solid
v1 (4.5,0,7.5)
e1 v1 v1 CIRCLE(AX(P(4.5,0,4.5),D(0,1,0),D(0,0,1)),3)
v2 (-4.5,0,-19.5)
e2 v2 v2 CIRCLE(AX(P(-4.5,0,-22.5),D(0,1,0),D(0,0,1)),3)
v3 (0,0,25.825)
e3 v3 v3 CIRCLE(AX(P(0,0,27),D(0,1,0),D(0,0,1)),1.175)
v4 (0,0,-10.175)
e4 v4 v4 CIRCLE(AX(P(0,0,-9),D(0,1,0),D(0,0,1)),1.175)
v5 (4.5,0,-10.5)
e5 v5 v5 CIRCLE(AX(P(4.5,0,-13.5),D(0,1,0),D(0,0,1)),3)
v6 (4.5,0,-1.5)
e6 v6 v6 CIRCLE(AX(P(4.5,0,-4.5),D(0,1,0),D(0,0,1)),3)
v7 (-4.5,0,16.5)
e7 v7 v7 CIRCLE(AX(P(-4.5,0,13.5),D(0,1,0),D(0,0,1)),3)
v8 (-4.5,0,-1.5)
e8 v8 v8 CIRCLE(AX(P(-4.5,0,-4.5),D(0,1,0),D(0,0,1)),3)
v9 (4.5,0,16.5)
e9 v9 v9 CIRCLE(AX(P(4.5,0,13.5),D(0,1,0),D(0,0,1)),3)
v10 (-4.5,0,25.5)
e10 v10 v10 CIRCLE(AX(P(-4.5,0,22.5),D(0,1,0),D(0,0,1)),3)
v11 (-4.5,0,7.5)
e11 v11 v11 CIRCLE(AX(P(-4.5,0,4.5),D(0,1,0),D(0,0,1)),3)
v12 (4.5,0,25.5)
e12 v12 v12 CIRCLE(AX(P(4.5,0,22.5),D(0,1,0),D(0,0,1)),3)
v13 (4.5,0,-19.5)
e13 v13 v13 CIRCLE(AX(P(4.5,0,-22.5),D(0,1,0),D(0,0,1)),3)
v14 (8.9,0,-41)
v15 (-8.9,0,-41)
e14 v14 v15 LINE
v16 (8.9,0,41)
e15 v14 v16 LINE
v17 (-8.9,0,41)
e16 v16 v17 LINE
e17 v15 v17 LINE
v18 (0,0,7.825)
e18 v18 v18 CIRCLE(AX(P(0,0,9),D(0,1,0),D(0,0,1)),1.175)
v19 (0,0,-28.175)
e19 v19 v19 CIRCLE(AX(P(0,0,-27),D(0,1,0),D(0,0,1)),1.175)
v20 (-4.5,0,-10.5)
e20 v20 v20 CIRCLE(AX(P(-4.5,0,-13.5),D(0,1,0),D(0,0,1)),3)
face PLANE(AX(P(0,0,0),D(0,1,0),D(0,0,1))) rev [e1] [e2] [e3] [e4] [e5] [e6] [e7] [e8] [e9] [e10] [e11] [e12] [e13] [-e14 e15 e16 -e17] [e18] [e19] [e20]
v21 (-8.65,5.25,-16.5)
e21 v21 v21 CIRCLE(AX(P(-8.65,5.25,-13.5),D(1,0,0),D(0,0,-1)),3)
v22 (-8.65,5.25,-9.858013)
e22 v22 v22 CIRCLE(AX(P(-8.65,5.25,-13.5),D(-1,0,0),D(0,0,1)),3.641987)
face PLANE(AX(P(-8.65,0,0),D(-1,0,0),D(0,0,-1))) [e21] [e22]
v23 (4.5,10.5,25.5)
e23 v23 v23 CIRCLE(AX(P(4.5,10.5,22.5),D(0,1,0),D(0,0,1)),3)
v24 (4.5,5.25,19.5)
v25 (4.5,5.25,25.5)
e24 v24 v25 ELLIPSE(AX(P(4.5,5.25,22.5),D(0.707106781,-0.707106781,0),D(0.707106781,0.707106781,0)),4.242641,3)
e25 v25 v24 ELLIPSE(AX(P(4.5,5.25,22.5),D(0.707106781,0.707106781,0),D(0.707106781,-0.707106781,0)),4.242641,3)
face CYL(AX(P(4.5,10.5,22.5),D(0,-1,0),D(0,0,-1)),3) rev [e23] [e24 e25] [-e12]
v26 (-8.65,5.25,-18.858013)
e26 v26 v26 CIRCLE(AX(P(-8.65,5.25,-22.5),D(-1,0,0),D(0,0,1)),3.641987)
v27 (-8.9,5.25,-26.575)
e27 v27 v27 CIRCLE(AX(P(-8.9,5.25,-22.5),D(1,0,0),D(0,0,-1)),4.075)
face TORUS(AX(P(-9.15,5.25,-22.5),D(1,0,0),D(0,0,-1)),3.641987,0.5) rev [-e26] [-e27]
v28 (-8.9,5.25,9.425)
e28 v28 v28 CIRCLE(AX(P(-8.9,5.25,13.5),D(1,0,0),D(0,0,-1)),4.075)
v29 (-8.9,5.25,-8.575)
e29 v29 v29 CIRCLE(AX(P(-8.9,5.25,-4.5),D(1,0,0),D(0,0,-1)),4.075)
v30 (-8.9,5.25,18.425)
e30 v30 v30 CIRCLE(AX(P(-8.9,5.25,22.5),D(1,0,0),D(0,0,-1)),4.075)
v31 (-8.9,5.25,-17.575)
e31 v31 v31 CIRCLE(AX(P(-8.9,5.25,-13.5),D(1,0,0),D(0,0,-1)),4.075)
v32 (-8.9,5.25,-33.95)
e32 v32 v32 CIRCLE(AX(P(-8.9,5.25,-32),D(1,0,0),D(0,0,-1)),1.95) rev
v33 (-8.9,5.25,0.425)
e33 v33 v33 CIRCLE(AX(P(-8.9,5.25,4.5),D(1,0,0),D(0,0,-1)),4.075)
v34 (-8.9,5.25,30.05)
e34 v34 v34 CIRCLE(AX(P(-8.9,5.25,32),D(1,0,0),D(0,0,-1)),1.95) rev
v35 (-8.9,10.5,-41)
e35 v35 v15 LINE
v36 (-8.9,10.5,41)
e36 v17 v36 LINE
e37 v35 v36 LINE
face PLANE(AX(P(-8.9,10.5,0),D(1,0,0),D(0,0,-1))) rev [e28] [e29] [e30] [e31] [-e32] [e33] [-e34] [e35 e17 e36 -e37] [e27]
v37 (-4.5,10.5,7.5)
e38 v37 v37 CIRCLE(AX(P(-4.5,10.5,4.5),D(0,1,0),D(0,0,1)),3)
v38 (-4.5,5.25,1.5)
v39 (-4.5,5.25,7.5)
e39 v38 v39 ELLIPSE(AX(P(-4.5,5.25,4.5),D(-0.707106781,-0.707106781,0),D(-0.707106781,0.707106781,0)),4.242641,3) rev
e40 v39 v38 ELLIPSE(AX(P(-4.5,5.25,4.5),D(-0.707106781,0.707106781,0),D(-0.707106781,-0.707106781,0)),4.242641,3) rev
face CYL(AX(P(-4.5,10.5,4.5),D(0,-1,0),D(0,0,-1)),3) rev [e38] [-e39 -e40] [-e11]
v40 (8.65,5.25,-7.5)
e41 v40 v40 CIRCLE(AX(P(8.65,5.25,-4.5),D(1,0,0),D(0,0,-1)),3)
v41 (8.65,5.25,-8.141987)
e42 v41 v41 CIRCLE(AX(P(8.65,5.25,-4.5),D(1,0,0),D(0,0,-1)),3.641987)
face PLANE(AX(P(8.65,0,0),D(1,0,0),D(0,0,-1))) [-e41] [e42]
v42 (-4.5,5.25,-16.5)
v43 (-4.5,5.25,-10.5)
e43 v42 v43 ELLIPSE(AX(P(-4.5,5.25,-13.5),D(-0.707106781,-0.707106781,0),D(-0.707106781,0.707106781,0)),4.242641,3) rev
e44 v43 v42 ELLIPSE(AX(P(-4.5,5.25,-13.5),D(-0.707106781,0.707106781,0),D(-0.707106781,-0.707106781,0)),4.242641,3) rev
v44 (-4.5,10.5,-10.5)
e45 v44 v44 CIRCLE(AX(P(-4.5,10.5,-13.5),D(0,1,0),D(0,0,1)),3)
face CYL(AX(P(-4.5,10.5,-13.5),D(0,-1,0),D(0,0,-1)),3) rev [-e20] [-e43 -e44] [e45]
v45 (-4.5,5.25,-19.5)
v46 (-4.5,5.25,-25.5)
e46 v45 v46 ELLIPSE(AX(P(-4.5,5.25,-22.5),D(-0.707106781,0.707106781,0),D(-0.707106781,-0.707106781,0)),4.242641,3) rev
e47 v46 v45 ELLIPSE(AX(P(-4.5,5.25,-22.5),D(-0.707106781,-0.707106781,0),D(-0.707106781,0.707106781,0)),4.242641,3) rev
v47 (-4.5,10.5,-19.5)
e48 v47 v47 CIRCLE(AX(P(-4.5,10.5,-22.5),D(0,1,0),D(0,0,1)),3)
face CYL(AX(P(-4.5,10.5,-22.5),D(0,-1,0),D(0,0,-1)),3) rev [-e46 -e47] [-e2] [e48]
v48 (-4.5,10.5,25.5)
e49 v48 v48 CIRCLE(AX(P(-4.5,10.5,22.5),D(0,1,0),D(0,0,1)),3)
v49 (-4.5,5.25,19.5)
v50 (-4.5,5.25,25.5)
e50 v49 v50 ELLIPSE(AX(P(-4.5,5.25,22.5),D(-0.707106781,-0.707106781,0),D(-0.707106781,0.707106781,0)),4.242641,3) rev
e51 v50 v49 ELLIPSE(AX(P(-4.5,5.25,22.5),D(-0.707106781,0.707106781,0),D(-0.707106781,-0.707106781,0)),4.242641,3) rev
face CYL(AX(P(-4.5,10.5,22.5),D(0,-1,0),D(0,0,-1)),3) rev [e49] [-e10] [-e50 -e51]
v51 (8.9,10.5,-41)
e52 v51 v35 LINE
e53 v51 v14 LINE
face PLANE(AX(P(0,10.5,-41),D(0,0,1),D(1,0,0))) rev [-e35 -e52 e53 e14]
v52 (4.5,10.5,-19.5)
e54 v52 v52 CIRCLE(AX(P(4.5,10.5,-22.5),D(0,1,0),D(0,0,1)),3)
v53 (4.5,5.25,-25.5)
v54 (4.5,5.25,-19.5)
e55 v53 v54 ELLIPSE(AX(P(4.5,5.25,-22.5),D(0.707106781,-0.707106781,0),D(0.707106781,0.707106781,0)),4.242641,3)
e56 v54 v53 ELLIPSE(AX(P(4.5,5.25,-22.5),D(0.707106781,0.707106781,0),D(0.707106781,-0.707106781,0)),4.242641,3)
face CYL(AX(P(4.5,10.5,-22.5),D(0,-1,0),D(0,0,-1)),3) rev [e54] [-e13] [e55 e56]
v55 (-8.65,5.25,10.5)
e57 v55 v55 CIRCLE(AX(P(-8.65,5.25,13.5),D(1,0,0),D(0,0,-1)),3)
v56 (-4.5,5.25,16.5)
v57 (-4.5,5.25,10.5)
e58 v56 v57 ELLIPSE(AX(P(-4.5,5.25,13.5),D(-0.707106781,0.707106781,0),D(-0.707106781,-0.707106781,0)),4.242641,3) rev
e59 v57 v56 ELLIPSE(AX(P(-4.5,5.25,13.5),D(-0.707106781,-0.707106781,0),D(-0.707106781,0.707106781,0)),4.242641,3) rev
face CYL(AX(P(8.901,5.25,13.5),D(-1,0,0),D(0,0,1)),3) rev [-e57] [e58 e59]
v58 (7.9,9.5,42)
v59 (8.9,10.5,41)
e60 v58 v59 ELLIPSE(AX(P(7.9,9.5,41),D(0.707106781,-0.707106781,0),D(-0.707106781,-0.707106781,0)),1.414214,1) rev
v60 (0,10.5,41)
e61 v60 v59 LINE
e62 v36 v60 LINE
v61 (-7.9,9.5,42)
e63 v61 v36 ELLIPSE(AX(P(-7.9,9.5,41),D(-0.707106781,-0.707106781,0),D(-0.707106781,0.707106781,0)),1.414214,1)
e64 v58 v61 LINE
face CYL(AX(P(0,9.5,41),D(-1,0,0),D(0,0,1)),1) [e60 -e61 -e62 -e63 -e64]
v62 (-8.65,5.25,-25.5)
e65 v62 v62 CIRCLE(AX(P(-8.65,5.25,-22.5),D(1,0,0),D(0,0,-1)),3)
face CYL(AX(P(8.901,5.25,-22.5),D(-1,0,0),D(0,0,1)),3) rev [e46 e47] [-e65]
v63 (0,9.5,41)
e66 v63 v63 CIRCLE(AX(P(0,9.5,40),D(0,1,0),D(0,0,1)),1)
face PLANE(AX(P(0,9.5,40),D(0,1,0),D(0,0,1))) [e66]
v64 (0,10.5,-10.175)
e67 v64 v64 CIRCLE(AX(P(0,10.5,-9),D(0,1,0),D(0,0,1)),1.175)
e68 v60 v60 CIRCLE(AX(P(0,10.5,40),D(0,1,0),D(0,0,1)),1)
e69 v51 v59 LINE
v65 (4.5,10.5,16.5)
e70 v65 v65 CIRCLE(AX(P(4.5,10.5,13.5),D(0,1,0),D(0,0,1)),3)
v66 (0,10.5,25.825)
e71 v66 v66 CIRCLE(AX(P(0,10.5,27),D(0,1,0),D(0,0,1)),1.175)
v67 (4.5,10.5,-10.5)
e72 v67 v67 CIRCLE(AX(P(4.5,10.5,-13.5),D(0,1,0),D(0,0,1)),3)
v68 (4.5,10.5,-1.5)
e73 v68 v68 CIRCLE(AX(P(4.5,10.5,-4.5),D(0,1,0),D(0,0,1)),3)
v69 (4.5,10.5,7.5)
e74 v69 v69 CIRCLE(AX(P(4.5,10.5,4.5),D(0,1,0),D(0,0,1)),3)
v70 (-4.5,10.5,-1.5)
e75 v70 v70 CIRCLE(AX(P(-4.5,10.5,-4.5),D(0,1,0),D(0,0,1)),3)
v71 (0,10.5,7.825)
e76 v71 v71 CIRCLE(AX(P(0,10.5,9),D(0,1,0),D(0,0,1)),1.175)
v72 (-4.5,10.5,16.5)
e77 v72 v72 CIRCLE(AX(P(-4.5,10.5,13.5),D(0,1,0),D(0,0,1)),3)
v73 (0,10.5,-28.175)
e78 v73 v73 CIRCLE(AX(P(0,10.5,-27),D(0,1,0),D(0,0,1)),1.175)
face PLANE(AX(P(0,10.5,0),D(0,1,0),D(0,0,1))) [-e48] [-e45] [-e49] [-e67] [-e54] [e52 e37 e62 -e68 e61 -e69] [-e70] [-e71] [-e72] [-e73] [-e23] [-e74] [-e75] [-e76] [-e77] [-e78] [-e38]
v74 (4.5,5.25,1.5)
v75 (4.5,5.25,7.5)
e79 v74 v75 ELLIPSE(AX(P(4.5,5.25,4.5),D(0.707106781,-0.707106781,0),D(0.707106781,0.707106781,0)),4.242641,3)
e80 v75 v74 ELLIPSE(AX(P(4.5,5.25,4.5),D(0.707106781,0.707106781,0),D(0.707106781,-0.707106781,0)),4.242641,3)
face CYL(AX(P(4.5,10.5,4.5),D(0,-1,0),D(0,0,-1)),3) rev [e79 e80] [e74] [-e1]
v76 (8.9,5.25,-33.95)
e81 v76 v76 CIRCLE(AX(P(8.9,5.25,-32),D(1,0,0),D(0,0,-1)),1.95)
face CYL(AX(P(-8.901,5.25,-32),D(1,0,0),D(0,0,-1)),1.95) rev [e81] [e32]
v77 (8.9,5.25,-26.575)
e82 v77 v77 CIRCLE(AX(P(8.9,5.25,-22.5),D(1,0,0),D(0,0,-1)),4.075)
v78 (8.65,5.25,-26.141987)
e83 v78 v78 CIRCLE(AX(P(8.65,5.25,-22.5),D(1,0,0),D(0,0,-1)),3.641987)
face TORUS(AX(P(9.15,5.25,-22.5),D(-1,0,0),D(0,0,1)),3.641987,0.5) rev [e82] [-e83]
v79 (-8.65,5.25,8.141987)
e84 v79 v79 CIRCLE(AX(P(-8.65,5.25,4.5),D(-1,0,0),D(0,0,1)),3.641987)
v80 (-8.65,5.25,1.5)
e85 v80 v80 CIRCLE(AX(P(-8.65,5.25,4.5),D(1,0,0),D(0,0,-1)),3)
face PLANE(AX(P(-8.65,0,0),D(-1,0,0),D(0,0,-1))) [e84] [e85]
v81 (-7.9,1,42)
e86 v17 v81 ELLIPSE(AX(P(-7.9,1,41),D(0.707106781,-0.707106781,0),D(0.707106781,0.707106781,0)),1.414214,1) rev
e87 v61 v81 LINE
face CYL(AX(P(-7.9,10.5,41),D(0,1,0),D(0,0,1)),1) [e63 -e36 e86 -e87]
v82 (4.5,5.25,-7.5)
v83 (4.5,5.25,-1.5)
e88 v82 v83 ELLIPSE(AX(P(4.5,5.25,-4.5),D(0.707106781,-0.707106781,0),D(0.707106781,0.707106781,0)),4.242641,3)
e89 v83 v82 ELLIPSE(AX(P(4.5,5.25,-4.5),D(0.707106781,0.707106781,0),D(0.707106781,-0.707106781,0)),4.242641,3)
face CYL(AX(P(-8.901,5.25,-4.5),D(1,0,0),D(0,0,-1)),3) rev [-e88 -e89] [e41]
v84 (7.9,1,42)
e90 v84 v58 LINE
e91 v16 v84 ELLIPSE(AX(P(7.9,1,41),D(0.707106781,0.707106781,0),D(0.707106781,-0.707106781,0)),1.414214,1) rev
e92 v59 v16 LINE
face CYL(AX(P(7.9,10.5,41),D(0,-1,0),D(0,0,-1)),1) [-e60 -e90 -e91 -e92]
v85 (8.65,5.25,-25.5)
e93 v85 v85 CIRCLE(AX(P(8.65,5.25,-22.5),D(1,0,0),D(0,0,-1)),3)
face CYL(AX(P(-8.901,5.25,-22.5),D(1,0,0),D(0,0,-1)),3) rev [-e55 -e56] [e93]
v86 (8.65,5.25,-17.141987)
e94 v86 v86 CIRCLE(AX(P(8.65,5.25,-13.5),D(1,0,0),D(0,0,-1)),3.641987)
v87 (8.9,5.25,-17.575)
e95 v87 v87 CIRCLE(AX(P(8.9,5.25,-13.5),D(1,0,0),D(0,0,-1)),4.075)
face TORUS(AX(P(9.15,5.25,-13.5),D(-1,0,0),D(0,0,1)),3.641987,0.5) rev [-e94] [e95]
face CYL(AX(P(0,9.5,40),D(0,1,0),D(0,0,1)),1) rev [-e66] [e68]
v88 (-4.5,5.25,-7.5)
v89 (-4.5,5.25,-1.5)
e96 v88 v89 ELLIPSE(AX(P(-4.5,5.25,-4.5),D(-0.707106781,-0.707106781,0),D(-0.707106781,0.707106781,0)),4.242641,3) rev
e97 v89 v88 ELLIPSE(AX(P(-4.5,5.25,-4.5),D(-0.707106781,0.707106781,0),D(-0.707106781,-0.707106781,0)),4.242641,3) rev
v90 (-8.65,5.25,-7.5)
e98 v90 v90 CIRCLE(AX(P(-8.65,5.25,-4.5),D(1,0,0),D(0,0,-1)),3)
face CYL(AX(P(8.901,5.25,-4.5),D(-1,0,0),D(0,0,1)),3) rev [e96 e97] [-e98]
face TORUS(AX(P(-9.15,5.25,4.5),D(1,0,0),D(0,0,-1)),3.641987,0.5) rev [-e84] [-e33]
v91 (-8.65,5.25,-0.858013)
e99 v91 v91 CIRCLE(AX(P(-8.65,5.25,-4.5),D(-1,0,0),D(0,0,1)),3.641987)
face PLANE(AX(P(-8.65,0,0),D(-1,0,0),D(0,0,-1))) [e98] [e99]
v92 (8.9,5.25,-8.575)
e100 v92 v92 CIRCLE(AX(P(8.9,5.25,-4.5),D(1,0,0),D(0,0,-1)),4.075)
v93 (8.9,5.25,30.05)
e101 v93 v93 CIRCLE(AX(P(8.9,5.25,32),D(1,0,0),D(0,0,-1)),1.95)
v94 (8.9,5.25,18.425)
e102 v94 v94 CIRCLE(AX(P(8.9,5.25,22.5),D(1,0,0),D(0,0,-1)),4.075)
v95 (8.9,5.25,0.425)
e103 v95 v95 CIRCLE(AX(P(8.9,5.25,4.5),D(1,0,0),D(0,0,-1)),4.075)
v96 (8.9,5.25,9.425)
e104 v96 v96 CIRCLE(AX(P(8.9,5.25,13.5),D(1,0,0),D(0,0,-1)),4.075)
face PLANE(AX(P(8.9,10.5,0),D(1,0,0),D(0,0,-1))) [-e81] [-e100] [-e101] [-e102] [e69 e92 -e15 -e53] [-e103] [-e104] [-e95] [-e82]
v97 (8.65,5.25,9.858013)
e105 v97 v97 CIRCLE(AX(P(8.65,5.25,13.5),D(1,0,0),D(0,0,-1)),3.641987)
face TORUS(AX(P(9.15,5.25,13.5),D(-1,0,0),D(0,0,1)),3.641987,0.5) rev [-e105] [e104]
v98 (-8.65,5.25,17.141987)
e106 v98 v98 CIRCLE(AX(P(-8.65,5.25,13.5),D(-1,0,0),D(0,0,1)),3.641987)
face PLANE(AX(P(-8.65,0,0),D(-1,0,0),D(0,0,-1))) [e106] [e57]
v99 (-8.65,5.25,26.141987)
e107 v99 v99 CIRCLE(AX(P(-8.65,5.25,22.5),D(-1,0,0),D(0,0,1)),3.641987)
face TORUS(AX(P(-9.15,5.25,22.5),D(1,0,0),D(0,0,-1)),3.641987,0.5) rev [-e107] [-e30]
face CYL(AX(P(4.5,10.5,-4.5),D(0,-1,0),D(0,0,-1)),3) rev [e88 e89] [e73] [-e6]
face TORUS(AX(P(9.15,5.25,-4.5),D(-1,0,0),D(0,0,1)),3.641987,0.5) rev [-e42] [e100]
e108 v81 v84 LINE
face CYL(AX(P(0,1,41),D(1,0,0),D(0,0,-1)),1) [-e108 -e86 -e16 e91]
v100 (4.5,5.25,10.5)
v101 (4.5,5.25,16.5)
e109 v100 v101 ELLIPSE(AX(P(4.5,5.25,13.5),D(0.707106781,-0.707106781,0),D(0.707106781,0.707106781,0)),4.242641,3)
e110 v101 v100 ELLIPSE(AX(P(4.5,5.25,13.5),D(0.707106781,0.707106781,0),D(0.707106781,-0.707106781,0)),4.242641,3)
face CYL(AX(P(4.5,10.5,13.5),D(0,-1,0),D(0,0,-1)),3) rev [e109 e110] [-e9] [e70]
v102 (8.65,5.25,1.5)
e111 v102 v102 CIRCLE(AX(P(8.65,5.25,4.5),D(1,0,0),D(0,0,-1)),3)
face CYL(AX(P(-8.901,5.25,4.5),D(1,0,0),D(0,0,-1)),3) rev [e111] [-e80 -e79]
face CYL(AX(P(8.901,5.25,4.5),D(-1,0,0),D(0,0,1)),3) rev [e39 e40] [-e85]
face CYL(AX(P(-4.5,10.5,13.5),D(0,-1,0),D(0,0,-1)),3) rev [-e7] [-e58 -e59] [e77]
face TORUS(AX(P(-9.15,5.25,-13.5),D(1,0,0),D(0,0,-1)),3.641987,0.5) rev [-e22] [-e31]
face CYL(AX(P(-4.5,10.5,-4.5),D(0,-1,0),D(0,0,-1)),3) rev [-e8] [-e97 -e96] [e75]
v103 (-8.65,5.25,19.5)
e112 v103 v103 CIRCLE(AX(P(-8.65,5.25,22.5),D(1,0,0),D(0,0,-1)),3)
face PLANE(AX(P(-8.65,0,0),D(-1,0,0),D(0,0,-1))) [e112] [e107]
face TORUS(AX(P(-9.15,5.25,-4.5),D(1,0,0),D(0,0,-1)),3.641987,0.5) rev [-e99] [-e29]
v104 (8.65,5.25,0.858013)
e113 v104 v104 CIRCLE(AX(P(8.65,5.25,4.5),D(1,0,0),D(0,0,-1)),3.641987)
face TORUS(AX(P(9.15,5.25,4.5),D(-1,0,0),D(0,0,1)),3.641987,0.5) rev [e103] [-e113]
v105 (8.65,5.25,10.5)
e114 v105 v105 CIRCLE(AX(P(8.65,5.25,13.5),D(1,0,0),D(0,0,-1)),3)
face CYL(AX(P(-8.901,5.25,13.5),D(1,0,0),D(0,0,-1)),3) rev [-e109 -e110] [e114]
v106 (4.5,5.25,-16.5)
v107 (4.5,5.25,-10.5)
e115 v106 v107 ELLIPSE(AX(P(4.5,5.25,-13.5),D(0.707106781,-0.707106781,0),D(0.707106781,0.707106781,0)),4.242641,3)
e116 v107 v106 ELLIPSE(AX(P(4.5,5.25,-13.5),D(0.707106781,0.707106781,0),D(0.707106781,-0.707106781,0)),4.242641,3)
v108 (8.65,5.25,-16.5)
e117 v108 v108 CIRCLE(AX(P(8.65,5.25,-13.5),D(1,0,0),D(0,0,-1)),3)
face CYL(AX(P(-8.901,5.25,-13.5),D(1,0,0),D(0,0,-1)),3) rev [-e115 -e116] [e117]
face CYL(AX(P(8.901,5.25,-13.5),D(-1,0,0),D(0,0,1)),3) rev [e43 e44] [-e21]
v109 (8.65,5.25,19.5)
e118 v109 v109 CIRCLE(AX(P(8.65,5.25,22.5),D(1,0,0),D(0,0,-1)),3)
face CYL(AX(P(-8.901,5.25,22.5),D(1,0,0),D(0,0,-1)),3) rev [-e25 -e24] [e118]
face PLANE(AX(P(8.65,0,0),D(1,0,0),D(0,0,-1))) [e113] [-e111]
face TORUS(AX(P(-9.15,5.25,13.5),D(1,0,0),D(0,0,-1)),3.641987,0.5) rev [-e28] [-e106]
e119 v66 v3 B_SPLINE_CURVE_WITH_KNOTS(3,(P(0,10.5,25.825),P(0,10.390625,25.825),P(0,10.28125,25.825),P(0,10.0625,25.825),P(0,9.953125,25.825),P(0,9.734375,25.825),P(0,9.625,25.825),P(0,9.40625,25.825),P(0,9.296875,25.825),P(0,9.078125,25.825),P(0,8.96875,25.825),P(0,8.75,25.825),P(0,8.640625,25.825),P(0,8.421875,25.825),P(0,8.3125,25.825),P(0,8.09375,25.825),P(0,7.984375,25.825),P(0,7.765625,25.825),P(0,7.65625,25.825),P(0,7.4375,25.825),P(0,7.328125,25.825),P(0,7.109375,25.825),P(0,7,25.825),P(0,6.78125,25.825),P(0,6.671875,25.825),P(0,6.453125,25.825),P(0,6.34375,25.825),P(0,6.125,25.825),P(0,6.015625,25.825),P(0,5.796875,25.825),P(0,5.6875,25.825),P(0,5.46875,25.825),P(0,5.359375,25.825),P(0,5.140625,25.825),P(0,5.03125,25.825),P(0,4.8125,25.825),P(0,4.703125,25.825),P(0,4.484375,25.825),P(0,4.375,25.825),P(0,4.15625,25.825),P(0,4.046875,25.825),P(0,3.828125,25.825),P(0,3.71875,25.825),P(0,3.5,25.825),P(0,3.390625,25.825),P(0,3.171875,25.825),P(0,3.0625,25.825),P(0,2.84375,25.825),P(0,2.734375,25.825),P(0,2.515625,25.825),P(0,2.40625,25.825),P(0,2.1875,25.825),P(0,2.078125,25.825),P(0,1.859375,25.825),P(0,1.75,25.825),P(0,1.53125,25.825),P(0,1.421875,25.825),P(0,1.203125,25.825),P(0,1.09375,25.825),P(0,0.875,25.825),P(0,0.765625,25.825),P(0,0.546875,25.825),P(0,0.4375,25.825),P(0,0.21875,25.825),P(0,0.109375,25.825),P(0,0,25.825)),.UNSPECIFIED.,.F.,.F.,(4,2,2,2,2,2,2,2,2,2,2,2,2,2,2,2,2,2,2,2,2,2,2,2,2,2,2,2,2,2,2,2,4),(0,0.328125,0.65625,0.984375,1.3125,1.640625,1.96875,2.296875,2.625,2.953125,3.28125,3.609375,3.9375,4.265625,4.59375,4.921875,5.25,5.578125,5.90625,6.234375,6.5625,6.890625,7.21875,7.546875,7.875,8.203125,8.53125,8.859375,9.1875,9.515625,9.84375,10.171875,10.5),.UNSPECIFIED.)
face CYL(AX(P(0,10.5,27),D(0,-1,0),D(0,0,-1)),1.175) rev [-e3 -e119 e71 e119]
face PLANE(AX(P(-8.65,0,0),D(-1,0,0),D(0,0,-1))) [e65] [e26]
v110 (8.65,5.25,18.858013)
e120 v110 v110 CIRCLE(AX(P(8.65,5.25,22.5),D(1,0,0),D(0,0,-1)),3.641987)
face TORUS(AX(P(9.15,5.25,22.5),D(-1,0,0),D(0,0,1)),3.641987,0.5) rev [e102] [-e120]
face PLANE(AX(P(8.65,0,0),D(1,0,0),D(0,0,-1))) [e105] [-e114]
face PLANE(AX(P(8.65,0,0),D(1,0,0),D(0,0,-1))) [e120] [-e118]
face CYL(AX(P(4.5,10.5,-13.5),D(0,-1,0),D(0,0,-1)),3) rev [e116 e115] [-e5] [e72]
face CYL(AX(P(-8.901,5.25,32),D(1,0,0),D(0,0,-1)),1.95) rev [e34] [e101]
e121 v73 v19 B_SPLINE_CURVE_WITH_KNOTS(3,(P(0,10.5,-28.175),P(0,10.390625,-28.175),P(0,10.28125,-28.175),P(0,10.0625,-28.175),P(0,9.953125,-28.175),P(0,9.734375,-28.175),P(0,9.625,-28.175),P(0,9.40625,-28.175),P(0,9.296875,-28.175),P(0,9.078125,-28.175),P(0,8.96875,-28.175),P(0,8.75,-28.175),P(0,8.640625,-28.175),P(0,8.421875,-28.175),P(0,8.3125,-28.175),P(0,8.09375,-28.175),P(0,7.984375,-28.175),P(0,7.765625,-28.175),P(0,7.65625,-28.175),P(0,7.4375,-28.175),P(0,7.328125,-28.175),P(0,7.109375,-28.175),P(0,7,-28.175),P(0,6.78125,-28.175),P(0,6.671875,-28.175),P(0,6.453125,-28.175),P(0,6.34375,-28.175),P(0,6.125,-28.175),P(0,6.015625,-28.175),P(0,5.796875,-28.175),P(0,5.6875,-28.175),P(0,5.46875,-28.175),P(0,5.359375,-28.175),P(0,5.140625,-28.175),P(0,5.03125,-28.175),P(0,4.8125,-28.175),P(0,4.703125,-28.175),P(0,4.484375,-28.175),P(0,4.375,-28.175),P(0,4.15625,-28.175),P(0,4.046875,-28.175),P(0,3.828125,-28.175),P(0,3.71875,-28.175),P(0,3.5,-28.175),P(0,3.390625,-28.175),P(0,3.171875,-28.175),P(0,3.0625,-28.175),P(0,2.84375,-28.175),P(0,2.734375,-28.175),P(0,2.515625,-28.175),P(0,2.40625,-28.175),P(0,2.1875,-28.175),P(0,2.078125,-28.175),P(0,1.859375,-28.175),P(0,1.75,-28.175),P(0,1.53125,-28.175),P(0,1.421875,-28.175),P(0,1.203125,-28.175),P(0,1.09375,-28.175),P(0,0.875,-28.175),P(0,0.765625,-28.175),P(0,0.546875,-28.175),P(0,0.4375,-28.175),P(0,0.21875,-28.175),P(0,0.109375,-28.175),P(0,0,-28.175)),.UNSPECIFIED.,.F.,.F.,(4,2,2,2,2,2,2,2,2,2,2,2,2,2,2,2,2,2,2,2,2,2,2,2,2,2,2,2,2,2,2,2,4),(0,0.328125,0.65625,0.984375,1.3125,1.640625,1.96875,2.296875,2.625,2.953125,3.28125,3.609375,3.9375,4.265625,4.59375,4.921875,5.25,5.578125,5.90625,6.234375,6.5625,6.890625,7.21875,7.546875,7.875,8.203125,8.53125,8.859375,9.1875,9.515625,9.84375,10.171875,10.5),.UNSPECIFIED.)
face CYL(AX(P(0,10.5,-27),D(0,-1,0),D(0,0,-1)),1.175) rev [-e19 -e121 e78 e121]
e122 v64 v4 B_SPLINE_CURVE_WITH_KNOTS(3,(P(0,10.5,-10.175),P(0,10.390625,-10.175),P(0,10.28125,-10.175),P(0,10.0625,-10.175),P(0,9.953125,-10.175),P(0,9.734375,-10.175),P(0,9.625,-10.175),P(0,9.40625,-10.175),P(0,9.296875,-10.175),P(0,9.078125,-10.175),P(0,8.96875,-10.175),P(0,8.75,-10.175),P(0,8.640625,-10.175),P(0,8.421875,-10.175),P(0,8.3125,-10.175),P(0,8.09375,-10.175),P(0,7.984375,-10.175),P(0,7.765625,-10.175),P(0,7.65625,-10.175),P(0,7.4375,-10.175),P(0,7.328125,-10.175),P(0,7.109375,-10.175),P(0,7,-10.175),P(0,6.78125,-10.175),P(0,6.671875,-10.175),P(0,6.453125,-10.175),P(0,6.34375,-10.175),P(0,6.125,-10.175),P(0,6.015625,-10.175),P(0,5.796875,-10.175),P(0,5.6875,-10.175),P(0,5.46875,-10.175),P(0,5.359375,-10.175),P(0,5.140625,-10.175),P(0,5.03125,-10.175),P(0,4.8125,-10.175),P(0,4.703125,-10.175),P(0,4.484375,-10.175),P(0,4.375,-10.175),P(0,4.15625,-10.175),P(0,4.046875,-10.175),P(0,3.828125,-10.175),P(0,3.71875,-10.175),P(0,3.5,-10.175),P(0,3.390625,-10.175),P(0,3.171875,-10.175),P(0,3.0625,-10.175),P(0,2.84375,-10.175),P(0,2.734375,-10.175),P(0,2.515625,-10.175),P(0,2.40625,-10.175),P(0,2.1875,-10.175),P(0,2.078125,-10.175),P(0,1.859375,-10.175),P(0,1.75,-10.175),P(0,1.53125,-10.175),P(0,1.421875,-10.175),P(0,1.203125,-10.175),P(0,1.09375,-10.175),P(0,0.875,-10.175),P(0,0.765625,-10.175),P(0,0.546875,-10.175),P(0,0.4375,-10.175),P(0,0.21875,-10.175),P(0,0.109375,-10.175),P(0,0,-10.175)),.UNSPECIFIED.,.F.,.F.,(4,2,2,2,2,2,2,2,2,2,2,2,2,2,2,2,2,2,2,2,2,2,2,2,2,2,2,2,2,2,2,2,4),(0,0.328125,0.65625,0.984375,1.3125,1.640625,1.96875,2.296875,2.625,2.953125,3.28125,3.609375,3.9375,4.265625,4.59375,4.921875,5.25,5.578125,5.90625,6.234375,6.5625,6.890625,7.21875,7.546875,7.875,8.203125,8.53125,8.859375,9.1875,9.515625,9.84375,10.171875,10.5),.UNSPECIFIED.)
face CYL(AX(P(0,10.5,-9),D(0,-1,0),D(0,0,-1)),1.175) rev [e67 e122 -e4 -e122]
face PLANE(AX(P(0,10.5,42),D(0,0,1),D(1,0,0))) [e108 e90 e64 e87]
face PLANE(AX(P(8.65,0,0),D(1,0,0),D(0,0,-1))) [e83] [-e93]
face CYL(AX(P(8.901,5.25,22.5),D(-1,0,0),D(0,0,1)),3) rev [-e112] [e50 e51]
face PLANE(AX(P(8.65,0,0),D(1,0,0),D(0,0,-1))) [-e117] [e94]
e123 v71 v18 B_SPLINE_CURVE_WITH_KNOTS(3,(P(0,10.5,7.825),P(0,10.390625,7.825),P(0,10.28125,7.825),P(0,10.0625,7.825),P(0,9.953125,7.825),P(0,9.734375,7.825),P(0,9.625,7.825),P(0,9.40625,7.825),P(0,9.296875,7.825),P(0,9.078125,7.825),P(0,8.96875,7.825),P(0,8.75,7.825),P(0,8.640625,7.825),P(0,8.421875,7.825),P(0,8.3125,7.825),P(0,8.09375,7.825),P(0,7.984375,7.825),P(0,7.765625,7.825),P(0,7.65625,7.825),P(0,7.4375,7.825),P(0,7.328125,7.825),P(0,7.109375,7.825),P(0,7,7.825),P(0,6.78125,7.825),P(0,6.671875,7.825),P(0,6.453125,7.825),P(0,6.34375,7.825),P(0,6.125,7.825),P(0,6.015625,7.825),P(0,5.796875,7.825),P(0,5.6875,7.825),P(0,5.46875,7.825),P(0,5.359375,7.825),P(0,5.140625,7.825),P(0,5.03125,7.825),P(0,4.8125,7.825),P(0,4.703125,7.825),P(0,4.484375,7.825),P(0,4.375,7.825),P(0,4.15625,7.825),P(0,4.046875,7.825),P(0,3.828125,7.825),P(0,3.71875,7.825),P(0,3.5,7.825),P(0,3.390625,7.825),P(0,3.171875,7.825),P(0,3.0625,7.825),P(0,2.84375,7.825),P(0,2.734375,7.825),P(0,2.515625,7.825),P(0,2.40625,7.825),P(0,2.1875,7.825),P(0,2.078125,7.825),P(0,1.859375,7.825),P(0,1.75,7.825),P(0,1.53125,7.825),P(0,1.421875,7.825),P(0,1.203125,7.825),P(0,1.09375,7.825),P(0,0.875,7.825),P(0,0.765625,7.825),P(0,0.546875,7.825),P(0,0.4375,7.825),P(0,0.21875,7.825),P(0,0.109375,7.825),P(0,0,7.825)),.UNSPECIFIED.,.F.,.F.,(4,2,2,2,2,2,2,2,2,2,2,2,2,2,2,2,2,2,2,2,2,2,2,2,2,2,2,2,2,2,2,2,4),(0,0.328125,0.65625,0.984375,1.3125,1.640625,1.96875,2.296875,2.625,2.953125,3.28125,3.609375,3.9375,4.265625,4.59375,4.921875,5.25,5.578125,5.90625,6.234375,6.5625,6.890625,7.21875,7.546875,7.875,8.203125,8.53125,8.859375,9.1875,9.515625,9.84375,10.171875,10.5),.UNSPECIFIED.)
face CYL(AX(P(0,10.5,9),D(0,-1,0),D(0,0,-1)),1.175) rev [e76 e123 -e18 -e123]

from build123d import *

# Parameters (mm, degrees)
SKETCH1_W            = 17.8
SKETCH1_H            = 83
SKETCH1_R            = 1.175
SKETCH1_R_2          = 3
BOSS_EXTRUDE1_DEPTH  = 10.5
SKETCH3_R            = 1
CUT_EXTRUDE1_DEPTH   = 1
FILLET1_R            = 1
CUT_EXTRUDE2_REACH   = 48.809
SKETCH4_R            = 1.95
CUT_EXTRUDE4_REACH   = 48.809
SKETCH4_3_R          = 3
SKETCH4_4_R          = 4.075
SKETCH4_4_R_2        = 3
CUT_EXTRUDE5_DEPTH   = 0.25
FILLET8_R            = 0.5
FILLET8_OF_MIRROR3_R = 0.5


# Some blends are built 0.0001 mm under size
with BuildPart() as part:
    # Sketch1 → Boss-Extrude1 (new body)
    with BuildSketch(Plane(origin=(0, 0, 0), x_dir=(1, 0, 0), z_dir=(0, 1, 0))):
        with Locations((0, -0.5)):
            Rectangle(SKETCH1_W, SKETCH1_H)
        with Locations(Location((0, 27, 0), (0, 0, 90))):
            Circle(SKETCH1_R, mode=Mode.SUBTRACT)
        with Locations(Location((0, 9, 0), (0, 0, 90))):
            Circle(SKETCH1_R, mode=Mode.SUBTRACT)
        with Locations(Location((0, -9, 0), (0, 0, 90))):
            Circle(SKETCH1_R, mode=Mode.SUBTRACT)
        with Locations(Location((0, -27, 0), (0, 0, 90))):
            Circle(SKETCH1_R, mode=Mode.SUBTRACT)
        with Locations(Location((-4.5, -22.5, 0), (0, 0, 90))):
            Circle(SKETCH1_R_2, mode=Mode.SUBTRACT)
        with Locations(Location((-4.5, -13.5, 0), (0, 0, 90))):
            Circle(SKETCH1_R_2, mode=Mode.SUBTRACT)
        with Locations(Location((-4.5, -4.5, 0), (0, 0, 90))):
            Circle(SKETCH1_R_2, mode=Mode.SUBTRACT)
        with Locations(Location((-4.5, 4.5, 0), (0, 0, 90))):
            Circle(SKETCH1_R_2, mode=Mode.SUBTRACT)
        with Locations(Location((-4.5, 13.5, 0), (0, 0, 90))):
            Circle(SKETCH1_R_2, mode=Mode.SUBTRACT)
        with Locations(Location((-4.5, 22.5, 0), (0, 0, 90))):
            Circle(SKETCH1_R_2, mode=Mode.SUBTRACT)
        with Locations(Location((4.5, -13.5, 0), (0, 0, 90))):
            Circle(SKETCH1_R_2, mode=Mode.SUBTRACT)
        with Locations(Location((4.5, -4.5, 0), (0, 0, 90))):
            Circle(SKETCH1_R_2, mode=Mode.SUBTRACT)
        with Locations(Location((4.5, 4.5, 0), (0, 0, 90))):
            Circle(SKETCH1_R_2, mode=Mode.SUBTRACT)
        with Locations(Location((4.5, 13.5, 0), (0, 0, 90))):
            Circle(SKETCH1_R_2, mode=Mode.SUBTRACT)
        with Locations(Location((4.5, 22.5, 0), (0, 0, 90))):
            Circle(SKETCH1_R_2, mode=Mode.SUBTRACT)
        with Locations(Location((4.5, -22.5, 0), (0, 0, 90))):
            Circle(SKETCH1_R_2, mode=Mode.SUBTRACT)
    extrude(amount=BOSS_EXTRUDE1_DEPTH)

    # Sketch3 → Cut-Extrude1 (cut)
    with BuildSketch(Plane(origin=(0, 10.5, 0), x_dir=(1, 0, 0), z_dir=(0, 1, 0))):
        with Locations(Location((0, -40, 0), (0, 0, 270))):
            Circle(SKETCH3_R)
    extrude(amount=-CUT_EXTRUDE1_DEPTH, mode=Mode.SUBTRACT)

    # Fillet1
    fillet1_edges = [part.edges().sort_by_distance(p)[0] for p in [
        (0, 10.5, 42),
        (0, 0, 42),
        (-8.9, 5.25, 42),
        (8.9, 5.25, 42),
    ]]
    fillet(fillet1_edges, radius=FILLET1_R - 0.0001)  # a hair under: the kernel refuses the full size

    # Sketch4 → Cut-Extrude2 (cut, up to next)
    with BuildSketch(Plane(origin=(8.9, 0, 0), x_dir=(0, 0, -1), z_dir=(1, 0, 0)), mode=Mode.PRIVATE) as cut_extrude2_sk1:
        with Locations((-32, 5.25)):
            Circle(SKETCH4_R)
    cut_extrude2_tool1 = extrude(cut_extrude2_sk1.sketch, amount=-CUT_EXTRUDE2_REACH, mode=Mode.PRIVATE) & part.part
    # Sketch4 → Cut-Extrude2 (cut, up to next)
    with BuildSketch(Plane(origin=(8.9, 0, 0), x_dir=(0, 0, -1), z_dir=(1, 0, 0)), mode=Mode.PRIVATE) as cut_extrude2_sk2:
        with Locations((32, 5.25)):
            Circle(SKETCH4_R)
    cut_extrude2_tool2 = extrude(cut_extrude2_sk2.sketch, amount=-CUT_EXTRUDE2_REACH, mode=Mode.PRIVATE) & part.part
    add(cut_extrude2_tool1.solids().sort_by_distance((8.9, 5.25, 32))[0], mode=Mode.SUBTRACT)
    add(cut_extrude2_tool2.solids().sort_by_distance((8.9, 5.25, -32))[0], mode=Mode.SUBTRACT)

    # Sketch4<3> → Cut-Extrude4 (cut, up to next)
    with BuildSketch(Plane(origin=(8.9, 0, 0), x_dir=(0, 0, -1), z_dir=(1, 0, 0)), mode=Mode.PRIVATE) as cut_extrude4_sk1:
        with Locations((-22.5, 5.25)):
            Circle(SKETCH4_3_R)
    cut_extrude4_tool1 = extrude(cut_extrude4_sk1.sketch, amount=-CUT_EXTRUDE4_REACH, mode=Mode.PRIVATE) & part.part
    # Sketch4<3> → Cut-Extrude4 (cut, up to next)
    with BuildSketch(Plane(origin=(8.9, 0, 0), x_dir=(0, 0, -1), z_dir=(1, 0, 0)), mode=Mode.PRIVATE) as cut_extrude4_sk2:
        with Locations((-13.5, 5.25)):
            Circle(SKETCH4_3_R)
    cut_extrude4_tool2 = extrude(cut_extrude4_sk2.sketch, amount=-CUT_EXTRUDE4_REACH, mode=Mode.PRIVATE) & part.part
    # Sketch4<3> → Cut-Extrude4 (cut, up to next)
    with BuildSketch(Plane(origin=(8.9, 0, 0), x_dir=(0, 0, -1), z_dir=(1, 0, 0)), mode=Mode.PRIVATE) as cut_extrude4_sk3:
        with Locations((-4.5, 5.25)):
            Circle(SKETCH4_3_R)
    cut_extrude4_tool3 = extrude(cut_extrude4_sk3.sketch, amount=-CUT_EXTRUDE4_REACH, mode=Mode.PRIVATE) & part.part
    # Sketch4<3> → Cut-Extrude4 (cut, up to next)
    with BuildSketch(Plane(origin=(8.9, 0, 0), x_dir=(0, 0, -1), z_dir=(1, 0, 0)), mode=Mode.PRIVATE) as cut_extrude4_sk4:
        with Locations((4.5, 5.25)):
            Circle(SKETCH4_3_R)
    cut_extrude4_tool4 = extrude(cut_extrude4_sk4.sketch, amount=-CUT_EXTRUDE4_REACH, mode=Mode.PRIVATE) & part.part
    # Sketch4<3> → Cut-Extrude4 (cut, up to next)
    with BuildSketch(Plane(origin=(8.9, 0, 0), x_dir=(0, 0, -1), z_dir=(1, 0, 0)), mode=Mode.PRIVATE) as cut_extrude4_sk5:
        with Locations((13.5, 5.25)):
            Circle(SKETCH4_3_R)
    cut_extrude4_tool5 = extrude(cut_extrude4_sk5.sketch, amount=-CUT_EXTRUDE4_REACH, mode=Mode.PRIVATE) & part.part
    # Sketch4<3> → Cut-Extrude4 (cut, up to next)
    with BuildSketch(Plane(origin=(8.9, 0, 0), x_dir=(0, 0, -1), z_dir=(1, 0, 0)), mode=Mode.PRIVATE) as cut_extrude4_sk6:
        with Locations((22.5, 5.25)):
            Circle(SKETCH4_3_R)
    cut_extrude4_tool6 = extrude(cut_extrude4_sk6.sketch, amount=-CUT_EXTRUDE4_REACH, mode=Mode.PRIVATE) & part.part
    cut_extrude4_1 = cut_extrude4_tool1.solids().sort_by_distance((8.9, 5.25, 22.5))[0]
    add(cut_extrude4_1, mode=Mode.SUBTRACT)
    cut_extrude4_2 = cut_extrude4_tool2.solids().sort_by_distance((8.9, 5.25, 13.5))[0]
    add(cut_extrude4_2, mode=Mode.SUBTRACT)
    cut_extrude4_3 = cut_extrude4_tool3.solids().sort_by_distance((8.9, 5.25, 4.5))[0]
    add(cut_extrude4_3, mode=Mode.SUBTRACT)
    cut_extrude4_4 = cut_extrude4_tool4.solids().sort_by_distance((8.9, 5.25, -4.5))[0]
    add(cut_extrude4_4, mode=Mode.SUBTRACT)
    cut_extrude4_5 = cut_extrude4_tool5.solids().sort_by_distance((8.9, 5.25, -13.5))[0]
    add(cut_extrude4_5, mode=Mode.SUBTRACT)
    cut_extrude4_6 = cut_extrude4_tool6.solids().sort_by_distance((8.9, 5.25, -22.5))[0]
    add(cut_extrude4_6, mode=Mode.SUBTRACT)
    cut_extrude4 = cut_extrude4_1 + cut_extrude4_2 + cut_extrude4_3 + cut_extrude4_4 + cut_extrude4_5 + cut_extrude4_6  # Cut-Extrude4 as one shape, for the pattern or mirror that repeats it

    # Sketch4<4> → Cut-Extrude5 (cut)
    # profile 1 of 6: a face of its own
    with BuildSketch(Plane(origin=(8.9, 0, 0), x_dir=(0, 0, -1), z_dir=(1, 0, 0))):
        with Locations((-13.5, 5.25)):
            Circle(SKETCH4_4_R)
        with Locations((-13.5, 5.25)):
            Circle(SKETCH4_4_R_2, mode=Mode.SUBTRACT)
    # profile 2 of 6: a face of its own
    with BuildSketch(Plane(origin=(8.9, 0, 0), x_dir=(0, 0, -1), z_dir=(1, 0, 0))):
        with Locations((-22.5, 5.25)):
            Circle(SKETCH4_4_R)
        with Locations((-22.5, 5.25)):
            Circle(SKETCH4_4_R_2, mode=Mode.SUBTRACT)
    # profile 3 of 6: a face of its own
    with BuildSketch(Plane(origin=(8.9, 0, 0), x_dir=(0, 0, -1), z_dir=(1, 0, 0))):
        with Locations((-4.5, 5.25)):
            Circle(SKETCH4_4_R)
        with Locations((-4.5, 5.25)):
            Circle(SKETCH4_4_R_2, mode=Mode.SUBTRACT)
    # profile 4 of 6: a face of its own
    with BuildSketch(Plane(origin=(8.9, 0, 0), x_dir=(0, 0, -1), z_dir=(1, 0, 0))):
        with Locations((4.5, 5.25)):
            Circle(SKETCH4_4_R)
        with Locations((4.5, 5.25)):
            Circle(SKETCH4_4_R_2, mode=Mode.SUBTRACT)
    # profile 5 of 6: a face of its own
    with BuildSketch(Plane(origin=(8.9, 0, 0), x_dir=(0, 0, -1), z_dir=(1, 0, 0))):
        with Locations((13.5, 5.25)):
            Circle(SKETCH4_4_R)
        with Locations((13.5, 5.25)):
            Circle(SKETCH4_4_R_2, mode=Mode.SUBTRACT)
    # profile 6 of 6: a face of its own
    with BuildSketch(Plane(origin=(8.9, 0, 0), x_dir=(0, 0, -1), z_dir=(1, 0, 0))):
        with Locations((22.5, 5.25)):
            Circle(SKETCH4_4_R)
        with Locations((22.5, 5.25)):
            Circle(SKETCH4_4_R_2, mode=Mode.SUBTRACT)
    cut_extrude5 = extrude(amount=-CUT_EXTRUDE5_DEPTH, mode=Mode.SUBTRACT)

    # Fillet8
    # the kernel refuses this fillet: 0.5 mm, written as the material it adds along each edge
    with BuildSketch(Plane(origin=(8.65, 5.25, -22.5), x_dir=(0, 0, -1), z_dir=(0, -1, 0))) as fillet8_piece_1:
        with BuildLine():
            CenterArc((3.641987298, 0.5), FILLET8_R, 270, 60)
            Line((3.641987298, 0), (3.641987298, -0.01))
            Line((3.641987298, -0.01), (4.075, -0.01))
            Line((4.075, -0.01), (4.085, 0))
            ThreePointArc((4.085, 0), (4.085, 0.125), (4.083660254, 0.245))
            Line((4.083660254, 0.245), (4.075, 0.25))
        make_face()
    revolve(axis=Axis((8.65, 5.25, -22.5), (1, 0, 0)))
    with BuildSketch(Plane(origin=(8.65, 5.25, -13.5), x_dir=(0, 0, -1), z_dir=(0, -1, 0))) as fillet8_piece_2:
        with BuildLine():
            CenterArc((3.641987298, 0.5), FILLET8_R, 270, 60)
            Line((3.641987298, 0), (3.641987298, -0.01))
            Line((3.641987298, -0.01), (4.075, -0.01))
            Line((4.075, -0.01), (4.085, 0))
            ThreePointArc((4.085, 0), (4.085, 0.125), (4.083660254, 0.245))
            Line((4.083660254, 0.245), (4.075, 0.25))
        make_face()
    revolve(axis=Axis((8.65, 5.25, -13.5), (1, 0, 0)))
    with BuildSketch(Plane(origin=(8.65, 5.25, -4.5), x_dir=(0, 0, -1), z_dir=(0, -1, 0))) as fillet8_piece_3:
        with BuildLine():
            CenterArc((3.641987298, 0.5), FILLET8_R, 270, 60)
            Line((3.641987298, 0), (3.641987298, -0.01))
            Line((3.641987298, -0.01), (4.075, -0.01))
            Line((4.075, -0.01), (4.085, 0))
            ThreePointArc((4.085, 0), (4.085, 0.125), (4.083660254, 0.245))
            Line((4.083660254, 0.245), (4.075, 0.25))
        make_face()
    revolve(axis=Axis((8.65, 5.25, -4.5), (1, 0, 0)))
    with BuildSketch(Plane(origin=(8.65, 5.25, 4.5), x_dir=(0, 0, -1), z_dir=(0, -1, 0))) as fillet8_piece_4:
        with BuildLine():
            CenterArc((3.641987298, 0.5), FILLET8_R, 270, 60)
            Line((3.641987298, 0), (3.641987298, -0.01))
            Line((3.641987298, -0.01), (4.075, -0.01))
            Line((4.075, -0.01), (4.085, 0))
            ThreePointArc((4.085, 0), (4.085, 0.125), (4.083660254, 0.245))
            Line((4.083660254, 0.245), (4.075, 0.25))
        make_face()
    revolve(axis=Axis((8.65, 5.25, 4.5), (1, 0, 0)))
    with BuildSketch(Plane(origin=(8.65, 5.25, 22.5), x_dir=(0, 0, -1), z_dir=(0, -1, 0))) as fillet8_piece_5:
        with BuildLine():
            CenterArc((3.641987298, 0.5), FILLET8_R, 270, 60)
            Line((3.641987298, 0), (3.641987298, -0.01))
            Line((3.641987298, -0.01), (4.075, -0.01))
            Line((4.075, -0.01), (4.085, 0))
            ThreePointArc((4.085, 0), (4.085, 0.125), (4.083660254, 0.245))
            Line((4.083660254, 0.245), (4.075, 0.25))
        make_face()
    revolve(axis=Axis((8.65, 5.25, 22.5), (1, 0, 0)))
    with BuildSketch(Plane(origin=(8.65, 5.25, 13.5), x_dir=(0, 0, -1), z_dir=(0, -1, 0))) as fillet8_piece_6:
        with BuildLine():
            CenterArc((3.641987298, 0.5), FILLET8_R, 270, 60)
            Line((3.641987298, 0), (3.641987298, -0.01))
            Line((3.641987298, -0.01), (4.075, -0.01))
            Line((4.075, -0.01), (4.085, 0))
            ThreePointArc((4.085, 0), (4.085, 0.125), (4.083660254, 0.245))
            Line((4.083660254, 0.245), (4.075, 0.25))
        make_face()
    revolve(axis=Axis((8.65, 5.25, 13.5), (1, 0, 0)))

    # Mirror3: Cut-Extrude4, Cut-Extrude5 across plane
    add(cut_extrude4.mirror(Plane(origin=(0, 0, 0), x_dir=(0, 0, 1), z_dir=(1, 0, 0))), mode=Mode.SUBTRACT)
    add(cut_extrude5.mirror(Plane(origin=(0, 0, 0), x_dir=(0, 0, 1), z_dir=(1, 0, 0))), mode=Mode.SUBTRACT)

    # Fillet8 of Mirror3
    # the kernel refuses this fillet: 0.5 mm, written as the material it adds along each edge
    with BuildSketch(Plane(origin=(-8.65, 5.25, -22.5), x_dir=(0, 0, -1), z_dir=(0, -1, 0))) as fillet8_of_mirror3_piece_1:
        with BuildLine():
            CenterArc((3.641987298, -0.5), FILLET8_OF_MIRROR3_R, 30, 60)
            Line((3.641987298, 0), (3.641987298, 0.01))
            Line((3.641987298, 0.01), (4.075, 0.01))
            Line((4.075, 0.01), (4.085, 0))
            ThreePointArc((4.085, 0), (4.085, -0.125), (4.083660254, -0.245))
            Line((4.083660254, -0.245), (4.075, -0.25))
        make_face()
    revolve(axis=Axis((-8.65, 5.25, -22.5), (1, 0, 0)))
    with BuildSketch(Plane(origin=(-8.65, 5.25, -13.5), x_dir=(0, 0, -1), z_dir=(0, -1, 0))) as fillet8_of_mirror3_piece_2:
        with BuildLine():
            CenterArc((3.641987298, -0.5), FILLET8_OF_MIRROR3_R, 30, 60)
            Line((3.641987298, 0), (3.641987298, 0.01))
            Line((3.641987298, 0.01), (4.075, 0.01))
            Line((4.075, 0.01), (4.085, 0))
            ThreePointArc((4.085, 0), (4.085, -0.125), (4.083660254, -0.245))
            Line((4.083660254, -0.245), (4.075, -0.25))
        make_face()
    revolve(axis=Axis((-8.65, 5.25, -13.5), (1, 0, 0)))
    with BuildSketch(Plane(origin=(-8.65, 5.25, -4.5), x_dir=(0, 0, -1), z_dir=(0, -1, 0))) as fillet8_of_mirror3_piece_3:
        with BuildLine():
            CenterArc((3.641987298, -0.5), FILLET8_OF_MIRROR3_R, 30, 60)
            Line((3.641987298, 0), (3.641987298, 0.01))
            Line((3.641987298, 0.01), (4.075, 0.01))
            Line((4.075, 0.01), (4.085, 0))
            ThreePointArc((4.085, 0), (4.085, -0.125), (4.083660254, -0.245))
            Line((4.083660254, -0.245), (4.075, -0.25))
        make_face()
    revolve(axis=Axis((-8.65, 5.25, -4.5), (1, 0, 0)))
    with BuildSketch(Plane(origin=(-8.65, 5.25, 4.5), x_dir=(0, 0, -1), z_dir=(0, -1, 0))) as fillet8_of_mirror3_piece_4:
        with BuildLine():
            CenterArc((3.641987298, -0.5), FILLET8_OF_MIRROR3_R, 30, 60)
            Line((3.641987298, 0), (3.641987298, 0.01))
            Line((3.641987298, 0.01), (4.075, 0.01))
            Line((4.075, 0.01), (4.085, 0))
            ThreePointArc((4.085, 0), (4.085, -0.125), (4.083660254, -0.245))
            Line((4.083660254, -0.245), (4.075, -0.25))
        make_face()
    revolve(axis=Axis((-8.65, 5.25, 4.5), (1, 0, 0)))
    with BuildSketch(Plane(origin=(-8.65, 5.25, 22.5), x_dir=(0, 0, -1), z_dir=(0, -1, 0))) as fillet8_of_mirror3_piece_5:
        with BuildLine():
            CenterArc((3.641987298, -0.5), FILLET8_OF_MIRROR3_R, 30, 60)
            Line((3.641987298, 0), (3.641987298, 0.01))
            Line((3.641987298, 0.01), (4.075, 0.01))
            Line((4.075, 0.01), (4.085, 0))
            ThreePointArc((4.085, 0), (4.085, -0.125), (4.083660254, -0.245))
            Line((4.083660254, -0.245), (4.075, -0.25))
        make_face()
    revolve(axis=Axis((-8.65, 5.25, 22.5), (1, 0, 0)))
    with BuildSketch(Plane(origin=(-8.65, 5.25, 13.5), x_dir=(0, 0, -1), z_dir=(0, -1, 0))) as fillet8_of_mirror3_piece_6:
        with BuildLine():
            CenterArc((3.641987298, -0.5), FILLET8_OF_MIRROR3_R, 30, 60)
            Line((3.641987298, 0), (3.641987298, 0.01))
            Line((3.641987298, 0.01), (4.075, 0.01))
            Line((4.075, 0.01), (4.085, 0))
            ThreePointArc((4.085, 0), (4.085, -0.125), (4.083660254, -0.245))
            Line((4.083660254, -0.245), (4.075, -0.25))
        make_face()
    revolve(axis=Axis((-8.65, 5.25, 13.5), (1, 0, 0)))


solid = part.part
